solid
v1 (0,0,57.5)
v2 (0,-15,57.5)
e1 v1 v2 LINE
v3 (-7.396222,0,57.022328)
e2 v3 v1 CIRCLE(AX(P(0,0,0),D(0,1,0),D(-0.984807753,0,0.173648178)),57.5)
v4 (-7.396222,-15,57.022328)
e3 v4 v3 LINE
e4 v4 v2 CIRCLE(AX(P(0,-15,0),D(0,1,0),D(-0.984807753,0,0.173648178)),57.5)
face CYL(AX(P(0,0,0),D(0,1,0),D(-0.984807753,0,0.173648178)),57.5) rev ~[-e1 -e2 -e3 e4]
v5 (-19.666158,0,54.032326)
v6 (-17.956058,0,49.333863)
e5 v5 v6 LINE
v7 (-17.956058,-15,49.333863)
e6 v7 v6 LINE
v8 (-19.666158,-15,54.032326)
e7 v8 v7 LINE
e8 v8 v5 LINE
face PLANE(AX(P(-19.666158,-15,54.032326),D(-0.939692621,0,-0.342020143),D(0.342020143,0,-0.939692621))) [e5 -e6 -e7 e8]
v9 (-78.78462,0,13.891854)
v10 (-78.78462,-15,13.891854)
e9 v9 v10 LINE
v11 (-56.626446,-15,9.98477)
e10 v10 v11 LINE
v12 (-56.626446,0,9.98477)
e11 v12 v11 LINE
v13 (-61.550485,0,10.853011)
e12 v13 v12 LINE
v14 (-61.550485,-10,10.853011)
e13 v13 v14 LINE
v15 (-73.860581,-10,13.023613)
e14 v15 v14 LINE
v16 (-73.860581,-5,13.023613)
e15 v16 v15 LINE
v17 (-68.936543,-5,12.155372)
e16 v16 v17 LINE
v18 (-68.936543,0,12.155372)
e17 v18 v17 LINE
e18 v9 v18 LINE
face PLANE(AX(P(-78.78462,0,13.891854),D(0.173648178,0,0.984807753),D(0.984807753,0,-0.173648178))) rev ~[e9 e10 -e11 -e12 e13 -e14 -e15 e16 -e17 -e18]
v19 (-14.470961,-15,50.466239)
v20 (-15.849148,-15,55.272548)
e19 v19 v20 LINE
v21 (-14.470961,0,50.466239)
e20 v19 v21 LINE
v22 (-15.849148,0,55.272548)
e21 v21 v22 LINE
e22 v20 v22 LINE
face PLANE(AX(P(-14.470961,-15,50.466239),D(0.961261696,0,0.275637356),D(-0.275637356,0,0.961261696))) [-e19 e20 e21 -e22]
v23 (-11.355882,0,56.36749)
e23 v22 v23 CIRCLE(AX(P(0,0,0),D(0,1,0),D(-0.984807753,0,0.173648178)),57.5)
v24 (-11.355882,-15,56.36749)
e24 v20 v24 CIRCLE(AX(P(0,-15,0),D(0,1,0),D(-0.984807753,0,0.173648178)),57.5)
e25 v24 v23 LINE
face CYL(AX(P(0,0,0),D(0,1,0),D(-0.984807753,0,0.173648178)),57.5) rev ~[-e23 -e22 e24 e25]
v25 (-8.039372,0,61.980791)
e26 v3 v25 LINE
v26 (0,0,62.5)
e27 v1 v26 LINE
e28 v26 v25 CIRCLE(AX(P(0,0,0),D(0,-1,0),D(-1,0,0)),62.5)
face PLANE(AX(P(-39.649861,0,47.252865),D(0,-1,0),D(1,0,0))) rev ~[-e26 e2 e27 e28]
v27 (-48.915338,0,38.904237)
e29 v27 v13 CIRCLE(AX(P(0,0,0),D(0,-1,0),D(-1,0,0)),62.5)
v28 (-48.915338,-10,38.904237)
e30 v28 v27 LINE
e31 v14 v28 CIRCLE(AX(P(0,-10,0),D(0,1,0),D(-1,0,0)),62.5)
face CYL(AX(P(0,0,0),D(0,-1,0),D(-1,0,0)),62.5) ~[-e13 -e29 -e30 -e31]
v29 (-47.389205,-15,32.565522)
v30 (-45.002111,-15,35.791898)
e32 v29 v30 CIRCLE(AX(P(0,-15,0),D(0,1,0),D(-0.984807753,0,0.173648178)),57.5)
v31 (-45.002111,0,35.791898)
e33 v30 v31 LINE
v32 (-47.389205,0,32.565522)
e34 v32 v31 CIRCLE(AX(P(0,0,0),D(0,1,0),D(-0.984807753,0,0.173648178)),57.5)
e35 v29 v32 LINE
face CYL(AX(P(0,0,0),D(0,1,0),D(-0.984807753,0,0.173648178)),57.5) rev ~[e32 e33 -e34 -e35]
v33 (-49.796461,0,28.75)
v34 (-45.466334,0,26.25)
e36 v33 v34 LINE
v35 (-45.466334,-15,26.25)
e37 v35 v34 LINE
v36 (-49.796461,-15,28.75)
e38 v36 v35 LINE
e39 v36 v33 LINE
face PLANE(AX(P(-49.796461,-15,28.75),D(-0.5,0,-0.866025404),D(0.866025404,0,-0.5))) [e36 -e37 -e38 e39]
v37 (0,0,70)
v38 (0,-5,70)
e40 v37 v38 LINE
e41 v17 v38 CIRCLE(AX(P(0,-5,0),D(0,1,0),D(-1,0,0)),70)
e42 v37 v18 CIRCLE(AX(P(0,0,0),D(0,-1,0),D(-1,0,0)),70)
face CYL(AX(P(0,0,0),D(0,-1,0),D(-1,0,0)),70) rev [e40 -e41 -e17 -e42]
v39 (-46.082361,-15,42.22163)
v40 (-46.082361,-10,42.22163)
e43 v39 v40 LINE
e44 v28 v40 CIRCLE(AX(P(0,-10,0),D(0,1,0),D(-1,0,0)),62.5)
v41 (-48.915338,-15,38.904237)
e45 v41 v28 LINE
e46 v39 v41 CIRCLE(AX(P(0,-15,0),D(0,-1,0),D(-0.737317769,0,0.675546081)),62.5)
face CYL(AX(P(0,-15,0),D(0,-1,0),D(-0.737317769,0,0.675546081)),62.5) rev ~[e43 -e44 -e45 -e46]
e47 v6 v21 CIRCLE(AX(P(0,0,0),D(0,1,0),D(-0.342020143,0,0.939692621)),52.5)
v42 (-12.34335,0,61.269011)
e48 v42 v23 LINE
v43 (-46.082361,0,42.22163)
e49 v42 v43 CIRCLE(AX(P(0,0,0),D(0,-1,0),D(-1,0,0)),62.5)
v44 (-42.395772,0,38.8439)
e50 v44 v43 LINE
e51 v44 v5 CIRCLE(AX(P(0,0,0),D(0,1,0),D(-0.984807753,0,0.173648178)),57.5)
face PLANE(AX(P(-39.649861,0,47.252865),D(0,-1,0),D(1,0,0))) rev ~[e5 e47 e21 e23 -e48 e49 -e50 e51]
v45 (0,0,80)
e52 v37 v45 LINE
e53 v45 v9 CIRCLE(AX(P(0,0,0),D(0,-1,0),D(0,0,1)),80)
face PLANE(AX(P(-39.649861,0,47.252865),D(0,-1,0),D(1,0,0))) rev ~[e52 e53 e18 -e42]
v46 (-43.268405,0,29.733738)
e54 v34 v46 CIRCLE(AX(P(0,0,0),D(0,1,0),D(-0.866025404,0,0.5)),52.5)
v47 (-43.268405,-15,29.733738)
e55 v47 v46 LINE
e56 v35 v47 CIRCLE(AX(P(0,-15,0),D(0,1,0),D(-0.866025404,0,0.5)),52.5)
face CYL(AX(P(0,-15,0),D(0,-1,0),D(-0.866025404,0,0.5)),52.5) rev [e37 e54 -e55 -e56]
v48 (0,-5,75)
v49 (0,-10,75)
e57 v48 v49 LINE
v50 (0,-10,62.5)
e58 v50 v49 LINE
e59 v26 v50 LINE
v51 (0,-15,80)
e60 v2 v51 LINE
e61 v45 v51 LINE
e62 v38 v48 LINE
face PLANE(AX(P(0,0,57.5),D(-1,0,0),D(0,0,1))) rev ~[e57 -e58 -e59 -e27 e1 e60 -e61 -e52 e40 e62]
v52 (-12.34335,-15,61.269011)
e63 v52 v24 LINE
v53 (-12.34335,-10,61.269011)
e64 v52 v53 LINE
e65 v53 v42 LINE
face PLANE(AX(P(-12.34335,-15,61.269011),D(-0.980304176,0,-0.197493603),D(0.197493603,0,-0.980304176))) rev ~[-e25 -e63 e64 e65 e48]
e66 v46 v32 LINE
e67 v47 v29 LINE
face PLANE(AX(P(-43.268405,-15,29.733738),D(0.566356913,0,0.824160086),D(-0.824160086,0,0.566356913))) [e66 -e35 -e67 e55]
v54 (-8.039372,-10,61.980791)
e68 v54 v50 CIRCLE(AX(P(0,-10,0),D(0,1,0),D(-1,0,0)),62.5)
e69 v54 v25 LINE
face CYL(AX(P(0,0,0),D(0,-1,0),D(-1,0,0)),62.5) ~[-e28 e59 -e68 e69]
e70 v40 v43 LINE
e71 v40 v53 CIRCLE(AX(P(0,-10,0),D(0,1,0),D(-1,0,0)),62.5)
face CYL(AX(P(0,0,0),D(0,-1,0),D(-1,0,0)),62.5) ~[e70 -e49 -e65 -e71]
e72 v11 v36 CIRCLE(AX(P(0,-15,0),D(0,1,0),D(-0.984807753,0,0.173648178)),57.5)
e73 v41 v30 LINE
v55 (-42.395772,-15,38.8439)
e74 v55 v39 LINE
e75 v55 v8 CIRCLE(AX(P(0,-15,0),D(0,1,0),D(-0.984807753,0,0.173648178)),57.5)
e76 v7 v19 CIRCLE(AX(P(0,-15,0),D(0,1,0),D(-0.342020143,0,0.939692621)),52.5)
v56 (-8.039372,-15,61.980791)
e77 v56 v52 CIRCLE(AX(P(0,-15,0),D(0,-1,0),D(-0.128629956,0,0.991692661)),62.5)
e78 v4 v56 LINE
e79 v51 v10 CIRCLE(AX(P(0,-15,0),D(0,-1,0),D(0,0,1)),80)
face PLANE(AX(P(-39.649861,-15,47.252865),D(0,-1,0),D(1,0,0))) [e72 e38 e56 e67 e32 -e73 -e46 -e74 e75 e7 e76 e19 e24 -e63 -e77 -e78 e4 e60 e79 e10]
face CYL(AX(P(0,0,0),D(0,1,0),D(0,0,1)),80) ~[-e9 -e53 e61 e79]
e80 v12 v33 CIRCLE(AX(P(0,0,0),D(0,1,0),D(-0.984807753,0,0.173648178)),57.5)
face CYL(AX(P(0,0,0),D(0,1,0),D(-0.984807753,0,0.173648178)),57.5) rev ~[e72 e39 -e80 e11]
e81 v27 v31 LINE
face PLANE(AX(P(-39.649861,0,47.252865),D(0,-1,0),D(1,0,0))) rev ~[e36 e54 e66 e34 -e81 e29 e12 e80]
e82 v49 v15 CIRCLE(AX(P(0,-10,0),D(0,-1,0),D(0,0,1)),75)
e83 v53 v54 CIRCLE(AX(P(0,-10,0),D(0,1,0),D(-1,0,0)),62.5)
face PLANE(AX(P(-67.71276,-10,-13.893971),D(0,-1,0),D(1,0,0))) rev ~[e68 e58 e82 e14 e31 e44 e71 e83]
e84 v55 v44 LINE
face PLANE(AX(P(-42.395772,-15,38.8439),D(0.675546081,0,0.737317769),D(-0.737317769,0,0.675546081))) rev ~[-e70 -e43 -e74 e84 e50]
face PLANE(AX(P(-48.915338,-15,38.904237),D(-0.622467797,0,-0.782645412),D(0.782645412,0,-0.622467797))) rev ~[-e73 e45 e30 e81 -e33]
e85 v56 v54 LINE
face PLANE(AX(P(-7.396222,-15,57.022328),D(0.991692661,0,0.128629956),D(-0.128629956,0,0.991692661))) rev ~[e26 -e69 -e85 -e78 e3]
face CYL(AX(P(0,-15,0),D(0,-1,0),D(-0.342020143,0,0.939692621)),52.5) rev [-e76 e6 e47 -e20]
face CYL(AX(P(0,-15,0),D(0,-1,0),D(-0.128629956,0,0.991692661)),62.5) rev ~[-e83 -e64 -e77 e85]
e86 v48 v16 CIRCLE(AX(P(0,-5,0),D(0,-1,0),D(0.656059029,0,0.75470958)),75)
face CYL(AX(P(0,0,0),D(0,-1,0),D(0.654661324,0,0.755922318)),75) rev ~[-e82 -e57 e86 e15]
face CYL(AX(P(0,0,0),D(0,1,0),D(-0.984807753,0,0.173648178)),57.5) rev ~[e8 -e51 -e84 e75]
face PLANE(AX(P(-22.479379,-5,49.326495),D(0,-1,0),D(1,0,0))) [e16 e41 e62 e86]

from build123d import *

# Parameters (mm, degrees)
F1_DEPTH = 10
F3_DEPTH = 5
F5_DEPTH = 15
F8_DEPTH = 15
F9_DEPTH = 25


# Not quite as in the source:
# - a feature names something its author has since deleted; it is built from what else it names


with BuildPart() as f1:
    # F0 (on Front) → F1 (new body, symmetric)
    with BuildSketch(Plane.XZ):
        with BuildLine():
            Line((-62.5, -30), (-62.5, 0))
            Line((-62.5, 0), (-75, 0))
            ThreePointArc((-75, 0), (-73.4179734698, -15.3232232767), (-68.7386354243, -30))
            Line((-68.7386354243, -30), (-62.5, -30))
        make_face()
        with BuildLine():
            ThreePointArc((-68.7386354243, -30), (-73.4179734698, -15.3232232767), (-75, 0))
            Line((-75, 0), (-75, -30))
            Line((-75, -30), (-68.7386354243, -30))
        make_face()
        with BuildLine():
            Line((-75, 0), (-62.5, 0))
            ThreePointArc((-62.5, 0), (-44.1941738242, 44.1941738242), (0, 62.5))
            Line((0, 62.5), (0, 75))
            ThreePointArc((0, 75), (-53.033008589, 53.033008589), (-75, 0))
        make_face()
        with BuildLine():
            ThreePointArc((0, 62.5), (23.9177145228, 57.742470782), (44.1941738242, 44.1941738242))
            Line((44.1941738242, 44.1941738242), (44.1941738242, 56.6941738242))
            Line((44.1941738242, 56.6941738242), (49.0995993303, 56.6941738242))
            ThreePointArc((49.0995993303, 56.6941738242), (26.2005435362, 70.274686185), (0, 75))
            Line((0, 75), (0, 62.5))
        make_face()
        with BuildLine():
            Line((44.1941738242, 56.6941738242), (44.1941738242, 44.1941738242))
            Line((44.1941738242, 44.1941738242), (53.033008589, 53.033008589))
            ThreePointArc((53.033008589, 53.033008589), (51.0991040315, 54.8988302897), (49.0995993303, 56.6941738242))
            Line((49.0995993303, 56.6941738242), (44.1941738242, 56.6941738242))
        make_face()
        with BuildLine():
            ThreePointArc((49.0995993303, 56.6941738242), (51.0991040315, 54.8988302897), (53.033008589, 53.033008589))
            ThreePointArc((53.033008589, 53.033008589), (56.9861303035, 48.7604445533), (60.5959982177, 44.1941738242))
            Line((60.5959982177, 44.1941738242), (79.1941738242, 44.1941738242))
            Line((79.1941738242, 44.1941738242), (79.1941738242, 56.6941738242))
            Line((79.1941738242, 56.6941738242), (49.0995993303, 56.6941738242))
        make_face()
        with BuildLine():
            Line((53.033008589, 53.033008589), (44.1941738242, 44.1941738242))
            Line((44.1941738242, 44.1941738242), (60.5959982177, 44.1941738242))
            ThreePointArc((60.5959982177, 44.1941738242), (56.9861303035, 48.7604445533), (53.033008589, 53.033008589))
        make_face()
    extrude(amount=F1_DEPTH, both=True)

    # F2 (on Front) → F3 (cut, symmetric)
    with BuildSketch(Plane.XZ):
        with BuildLine():
            Line((45.9241320293, 52.8296706156), (49.2044271743, 56.6032185167))
            ThreePointArc((49.2044271743, 56.6032185167), (-31.1019931992, 68.2470953157), (-75, 0))
            Line((-75, 0), (-70, 0))
            ThreePointArc((-70, 0), (-29.0285269859, 63.6972889614), (45.9241320293, 52.8296706156))
        make_face()
    extrude(amount=F3_DEPTH, both=True, mode=Mode.SUBTRACT)


with BuildPart() as f5:
    # F4 (on Front) → F5 (new body)
    with BuildSketch(Plane.XZ):
        with BuildLine():
            ThreePointArc((-56.6264457982, 9.9847702158), (-36.960287557, 44.0475554793), (0, 57.5))
            Line((0, 57.5), (0, 80))
            ThreePointArc((0, 80), (-51.4230087749, 61.2835554495), (-78.784620241, 13.8918542134))
            Line((-78.784620241, 13.8918542134), (-56.6264457982, 9.9847702158))
        make_face()
    extrude(amount=F5_DEPTH)

    # F6: cut F1
    add(f1.part, mode=Mode.SUBTRACT)

    # F7 (on face) → F8 (join, through all)
    with BuildSketch(Plane.XZ.offset(15)):
        with BuildLine():
            ThreePointArc((-47.389204942, 32.5655224887), (-48.6302678935, 30.6813794443), (-49.7964607176, 28.75))
            Line((-49.7964607176, 28.75), (-45.4663336987, 26.25))
            ThreePointArc((-45.4663336987, 26.25), (-44.4015489462, 28.0134334057), (-43.2684045123, 29.7337379245))
            Line((-43.2684045123, 29.7337379245), (-47.389204942, 32.5655224887))
        make_face()
        with BuildLine():
            Line((-14.4709611804, 50.4662390368), (-15.8491479595, 55.2725475165))
            ThreePointArc((-15.8491479595, 55.2725475165), (-17.7684771766, 54.685749687), (-19.6661582412, 54.0323256952))
            Line((-19.6661582412, 54.0323256952), (-17.9560575246, 49.3338625913))
            ThreePointArc((-17.9560575246, 49.3338625913), (-16.2233922047, 49.9304671055), (-14.4709611804, 50.4662390368))
        make_face()
    extrude(amount=-F8_DEPTH)

    # F7 (on face) → F9 (cut)
    with BuildSketch(Plane.XZ.offset(15)):
        with BuildLine():
            Line((-48.9153382675, 38.9042373293), (-45.0021112061, 35.7918983429))
            ThreePointArc((-45.0021112061, 35.7918983429), (-43.7255778977, 37.3406459172), (-42.395771708, 38.8438996663))
            Line((-42.395771708, 38.8438996663), (-46.0823605522, 42.221630072))
            ThreePointArc((-46.0823605522, 42.221630072), (-47.5278020627, 40.5876586056), (-48.9153382675, 38.9042373293))
        make_face()
        with BuildLine():
            ThreePointArc((-11.3558821654, 56.3674901006), (-9.3817674339, 56.7294671209), (-7.396222464, 57.0223280239))
            Line((-7.396222464, 57.0223280239), (-8.0393722435, 61.9807913303))
            ThreePointArc((-8.0393722435, 61.9807913303), (-10.1975732978, 61.6624642618), (-12.3433501798, 61.269010979))
            Line((-12.3433501798, 61.269010979), (-11.3558821654, 56.3674901006))
        make_face()
    extrude(amount=-F9_DEPTH, mode=Mode.SUBTRACT)


solid = f5.part
